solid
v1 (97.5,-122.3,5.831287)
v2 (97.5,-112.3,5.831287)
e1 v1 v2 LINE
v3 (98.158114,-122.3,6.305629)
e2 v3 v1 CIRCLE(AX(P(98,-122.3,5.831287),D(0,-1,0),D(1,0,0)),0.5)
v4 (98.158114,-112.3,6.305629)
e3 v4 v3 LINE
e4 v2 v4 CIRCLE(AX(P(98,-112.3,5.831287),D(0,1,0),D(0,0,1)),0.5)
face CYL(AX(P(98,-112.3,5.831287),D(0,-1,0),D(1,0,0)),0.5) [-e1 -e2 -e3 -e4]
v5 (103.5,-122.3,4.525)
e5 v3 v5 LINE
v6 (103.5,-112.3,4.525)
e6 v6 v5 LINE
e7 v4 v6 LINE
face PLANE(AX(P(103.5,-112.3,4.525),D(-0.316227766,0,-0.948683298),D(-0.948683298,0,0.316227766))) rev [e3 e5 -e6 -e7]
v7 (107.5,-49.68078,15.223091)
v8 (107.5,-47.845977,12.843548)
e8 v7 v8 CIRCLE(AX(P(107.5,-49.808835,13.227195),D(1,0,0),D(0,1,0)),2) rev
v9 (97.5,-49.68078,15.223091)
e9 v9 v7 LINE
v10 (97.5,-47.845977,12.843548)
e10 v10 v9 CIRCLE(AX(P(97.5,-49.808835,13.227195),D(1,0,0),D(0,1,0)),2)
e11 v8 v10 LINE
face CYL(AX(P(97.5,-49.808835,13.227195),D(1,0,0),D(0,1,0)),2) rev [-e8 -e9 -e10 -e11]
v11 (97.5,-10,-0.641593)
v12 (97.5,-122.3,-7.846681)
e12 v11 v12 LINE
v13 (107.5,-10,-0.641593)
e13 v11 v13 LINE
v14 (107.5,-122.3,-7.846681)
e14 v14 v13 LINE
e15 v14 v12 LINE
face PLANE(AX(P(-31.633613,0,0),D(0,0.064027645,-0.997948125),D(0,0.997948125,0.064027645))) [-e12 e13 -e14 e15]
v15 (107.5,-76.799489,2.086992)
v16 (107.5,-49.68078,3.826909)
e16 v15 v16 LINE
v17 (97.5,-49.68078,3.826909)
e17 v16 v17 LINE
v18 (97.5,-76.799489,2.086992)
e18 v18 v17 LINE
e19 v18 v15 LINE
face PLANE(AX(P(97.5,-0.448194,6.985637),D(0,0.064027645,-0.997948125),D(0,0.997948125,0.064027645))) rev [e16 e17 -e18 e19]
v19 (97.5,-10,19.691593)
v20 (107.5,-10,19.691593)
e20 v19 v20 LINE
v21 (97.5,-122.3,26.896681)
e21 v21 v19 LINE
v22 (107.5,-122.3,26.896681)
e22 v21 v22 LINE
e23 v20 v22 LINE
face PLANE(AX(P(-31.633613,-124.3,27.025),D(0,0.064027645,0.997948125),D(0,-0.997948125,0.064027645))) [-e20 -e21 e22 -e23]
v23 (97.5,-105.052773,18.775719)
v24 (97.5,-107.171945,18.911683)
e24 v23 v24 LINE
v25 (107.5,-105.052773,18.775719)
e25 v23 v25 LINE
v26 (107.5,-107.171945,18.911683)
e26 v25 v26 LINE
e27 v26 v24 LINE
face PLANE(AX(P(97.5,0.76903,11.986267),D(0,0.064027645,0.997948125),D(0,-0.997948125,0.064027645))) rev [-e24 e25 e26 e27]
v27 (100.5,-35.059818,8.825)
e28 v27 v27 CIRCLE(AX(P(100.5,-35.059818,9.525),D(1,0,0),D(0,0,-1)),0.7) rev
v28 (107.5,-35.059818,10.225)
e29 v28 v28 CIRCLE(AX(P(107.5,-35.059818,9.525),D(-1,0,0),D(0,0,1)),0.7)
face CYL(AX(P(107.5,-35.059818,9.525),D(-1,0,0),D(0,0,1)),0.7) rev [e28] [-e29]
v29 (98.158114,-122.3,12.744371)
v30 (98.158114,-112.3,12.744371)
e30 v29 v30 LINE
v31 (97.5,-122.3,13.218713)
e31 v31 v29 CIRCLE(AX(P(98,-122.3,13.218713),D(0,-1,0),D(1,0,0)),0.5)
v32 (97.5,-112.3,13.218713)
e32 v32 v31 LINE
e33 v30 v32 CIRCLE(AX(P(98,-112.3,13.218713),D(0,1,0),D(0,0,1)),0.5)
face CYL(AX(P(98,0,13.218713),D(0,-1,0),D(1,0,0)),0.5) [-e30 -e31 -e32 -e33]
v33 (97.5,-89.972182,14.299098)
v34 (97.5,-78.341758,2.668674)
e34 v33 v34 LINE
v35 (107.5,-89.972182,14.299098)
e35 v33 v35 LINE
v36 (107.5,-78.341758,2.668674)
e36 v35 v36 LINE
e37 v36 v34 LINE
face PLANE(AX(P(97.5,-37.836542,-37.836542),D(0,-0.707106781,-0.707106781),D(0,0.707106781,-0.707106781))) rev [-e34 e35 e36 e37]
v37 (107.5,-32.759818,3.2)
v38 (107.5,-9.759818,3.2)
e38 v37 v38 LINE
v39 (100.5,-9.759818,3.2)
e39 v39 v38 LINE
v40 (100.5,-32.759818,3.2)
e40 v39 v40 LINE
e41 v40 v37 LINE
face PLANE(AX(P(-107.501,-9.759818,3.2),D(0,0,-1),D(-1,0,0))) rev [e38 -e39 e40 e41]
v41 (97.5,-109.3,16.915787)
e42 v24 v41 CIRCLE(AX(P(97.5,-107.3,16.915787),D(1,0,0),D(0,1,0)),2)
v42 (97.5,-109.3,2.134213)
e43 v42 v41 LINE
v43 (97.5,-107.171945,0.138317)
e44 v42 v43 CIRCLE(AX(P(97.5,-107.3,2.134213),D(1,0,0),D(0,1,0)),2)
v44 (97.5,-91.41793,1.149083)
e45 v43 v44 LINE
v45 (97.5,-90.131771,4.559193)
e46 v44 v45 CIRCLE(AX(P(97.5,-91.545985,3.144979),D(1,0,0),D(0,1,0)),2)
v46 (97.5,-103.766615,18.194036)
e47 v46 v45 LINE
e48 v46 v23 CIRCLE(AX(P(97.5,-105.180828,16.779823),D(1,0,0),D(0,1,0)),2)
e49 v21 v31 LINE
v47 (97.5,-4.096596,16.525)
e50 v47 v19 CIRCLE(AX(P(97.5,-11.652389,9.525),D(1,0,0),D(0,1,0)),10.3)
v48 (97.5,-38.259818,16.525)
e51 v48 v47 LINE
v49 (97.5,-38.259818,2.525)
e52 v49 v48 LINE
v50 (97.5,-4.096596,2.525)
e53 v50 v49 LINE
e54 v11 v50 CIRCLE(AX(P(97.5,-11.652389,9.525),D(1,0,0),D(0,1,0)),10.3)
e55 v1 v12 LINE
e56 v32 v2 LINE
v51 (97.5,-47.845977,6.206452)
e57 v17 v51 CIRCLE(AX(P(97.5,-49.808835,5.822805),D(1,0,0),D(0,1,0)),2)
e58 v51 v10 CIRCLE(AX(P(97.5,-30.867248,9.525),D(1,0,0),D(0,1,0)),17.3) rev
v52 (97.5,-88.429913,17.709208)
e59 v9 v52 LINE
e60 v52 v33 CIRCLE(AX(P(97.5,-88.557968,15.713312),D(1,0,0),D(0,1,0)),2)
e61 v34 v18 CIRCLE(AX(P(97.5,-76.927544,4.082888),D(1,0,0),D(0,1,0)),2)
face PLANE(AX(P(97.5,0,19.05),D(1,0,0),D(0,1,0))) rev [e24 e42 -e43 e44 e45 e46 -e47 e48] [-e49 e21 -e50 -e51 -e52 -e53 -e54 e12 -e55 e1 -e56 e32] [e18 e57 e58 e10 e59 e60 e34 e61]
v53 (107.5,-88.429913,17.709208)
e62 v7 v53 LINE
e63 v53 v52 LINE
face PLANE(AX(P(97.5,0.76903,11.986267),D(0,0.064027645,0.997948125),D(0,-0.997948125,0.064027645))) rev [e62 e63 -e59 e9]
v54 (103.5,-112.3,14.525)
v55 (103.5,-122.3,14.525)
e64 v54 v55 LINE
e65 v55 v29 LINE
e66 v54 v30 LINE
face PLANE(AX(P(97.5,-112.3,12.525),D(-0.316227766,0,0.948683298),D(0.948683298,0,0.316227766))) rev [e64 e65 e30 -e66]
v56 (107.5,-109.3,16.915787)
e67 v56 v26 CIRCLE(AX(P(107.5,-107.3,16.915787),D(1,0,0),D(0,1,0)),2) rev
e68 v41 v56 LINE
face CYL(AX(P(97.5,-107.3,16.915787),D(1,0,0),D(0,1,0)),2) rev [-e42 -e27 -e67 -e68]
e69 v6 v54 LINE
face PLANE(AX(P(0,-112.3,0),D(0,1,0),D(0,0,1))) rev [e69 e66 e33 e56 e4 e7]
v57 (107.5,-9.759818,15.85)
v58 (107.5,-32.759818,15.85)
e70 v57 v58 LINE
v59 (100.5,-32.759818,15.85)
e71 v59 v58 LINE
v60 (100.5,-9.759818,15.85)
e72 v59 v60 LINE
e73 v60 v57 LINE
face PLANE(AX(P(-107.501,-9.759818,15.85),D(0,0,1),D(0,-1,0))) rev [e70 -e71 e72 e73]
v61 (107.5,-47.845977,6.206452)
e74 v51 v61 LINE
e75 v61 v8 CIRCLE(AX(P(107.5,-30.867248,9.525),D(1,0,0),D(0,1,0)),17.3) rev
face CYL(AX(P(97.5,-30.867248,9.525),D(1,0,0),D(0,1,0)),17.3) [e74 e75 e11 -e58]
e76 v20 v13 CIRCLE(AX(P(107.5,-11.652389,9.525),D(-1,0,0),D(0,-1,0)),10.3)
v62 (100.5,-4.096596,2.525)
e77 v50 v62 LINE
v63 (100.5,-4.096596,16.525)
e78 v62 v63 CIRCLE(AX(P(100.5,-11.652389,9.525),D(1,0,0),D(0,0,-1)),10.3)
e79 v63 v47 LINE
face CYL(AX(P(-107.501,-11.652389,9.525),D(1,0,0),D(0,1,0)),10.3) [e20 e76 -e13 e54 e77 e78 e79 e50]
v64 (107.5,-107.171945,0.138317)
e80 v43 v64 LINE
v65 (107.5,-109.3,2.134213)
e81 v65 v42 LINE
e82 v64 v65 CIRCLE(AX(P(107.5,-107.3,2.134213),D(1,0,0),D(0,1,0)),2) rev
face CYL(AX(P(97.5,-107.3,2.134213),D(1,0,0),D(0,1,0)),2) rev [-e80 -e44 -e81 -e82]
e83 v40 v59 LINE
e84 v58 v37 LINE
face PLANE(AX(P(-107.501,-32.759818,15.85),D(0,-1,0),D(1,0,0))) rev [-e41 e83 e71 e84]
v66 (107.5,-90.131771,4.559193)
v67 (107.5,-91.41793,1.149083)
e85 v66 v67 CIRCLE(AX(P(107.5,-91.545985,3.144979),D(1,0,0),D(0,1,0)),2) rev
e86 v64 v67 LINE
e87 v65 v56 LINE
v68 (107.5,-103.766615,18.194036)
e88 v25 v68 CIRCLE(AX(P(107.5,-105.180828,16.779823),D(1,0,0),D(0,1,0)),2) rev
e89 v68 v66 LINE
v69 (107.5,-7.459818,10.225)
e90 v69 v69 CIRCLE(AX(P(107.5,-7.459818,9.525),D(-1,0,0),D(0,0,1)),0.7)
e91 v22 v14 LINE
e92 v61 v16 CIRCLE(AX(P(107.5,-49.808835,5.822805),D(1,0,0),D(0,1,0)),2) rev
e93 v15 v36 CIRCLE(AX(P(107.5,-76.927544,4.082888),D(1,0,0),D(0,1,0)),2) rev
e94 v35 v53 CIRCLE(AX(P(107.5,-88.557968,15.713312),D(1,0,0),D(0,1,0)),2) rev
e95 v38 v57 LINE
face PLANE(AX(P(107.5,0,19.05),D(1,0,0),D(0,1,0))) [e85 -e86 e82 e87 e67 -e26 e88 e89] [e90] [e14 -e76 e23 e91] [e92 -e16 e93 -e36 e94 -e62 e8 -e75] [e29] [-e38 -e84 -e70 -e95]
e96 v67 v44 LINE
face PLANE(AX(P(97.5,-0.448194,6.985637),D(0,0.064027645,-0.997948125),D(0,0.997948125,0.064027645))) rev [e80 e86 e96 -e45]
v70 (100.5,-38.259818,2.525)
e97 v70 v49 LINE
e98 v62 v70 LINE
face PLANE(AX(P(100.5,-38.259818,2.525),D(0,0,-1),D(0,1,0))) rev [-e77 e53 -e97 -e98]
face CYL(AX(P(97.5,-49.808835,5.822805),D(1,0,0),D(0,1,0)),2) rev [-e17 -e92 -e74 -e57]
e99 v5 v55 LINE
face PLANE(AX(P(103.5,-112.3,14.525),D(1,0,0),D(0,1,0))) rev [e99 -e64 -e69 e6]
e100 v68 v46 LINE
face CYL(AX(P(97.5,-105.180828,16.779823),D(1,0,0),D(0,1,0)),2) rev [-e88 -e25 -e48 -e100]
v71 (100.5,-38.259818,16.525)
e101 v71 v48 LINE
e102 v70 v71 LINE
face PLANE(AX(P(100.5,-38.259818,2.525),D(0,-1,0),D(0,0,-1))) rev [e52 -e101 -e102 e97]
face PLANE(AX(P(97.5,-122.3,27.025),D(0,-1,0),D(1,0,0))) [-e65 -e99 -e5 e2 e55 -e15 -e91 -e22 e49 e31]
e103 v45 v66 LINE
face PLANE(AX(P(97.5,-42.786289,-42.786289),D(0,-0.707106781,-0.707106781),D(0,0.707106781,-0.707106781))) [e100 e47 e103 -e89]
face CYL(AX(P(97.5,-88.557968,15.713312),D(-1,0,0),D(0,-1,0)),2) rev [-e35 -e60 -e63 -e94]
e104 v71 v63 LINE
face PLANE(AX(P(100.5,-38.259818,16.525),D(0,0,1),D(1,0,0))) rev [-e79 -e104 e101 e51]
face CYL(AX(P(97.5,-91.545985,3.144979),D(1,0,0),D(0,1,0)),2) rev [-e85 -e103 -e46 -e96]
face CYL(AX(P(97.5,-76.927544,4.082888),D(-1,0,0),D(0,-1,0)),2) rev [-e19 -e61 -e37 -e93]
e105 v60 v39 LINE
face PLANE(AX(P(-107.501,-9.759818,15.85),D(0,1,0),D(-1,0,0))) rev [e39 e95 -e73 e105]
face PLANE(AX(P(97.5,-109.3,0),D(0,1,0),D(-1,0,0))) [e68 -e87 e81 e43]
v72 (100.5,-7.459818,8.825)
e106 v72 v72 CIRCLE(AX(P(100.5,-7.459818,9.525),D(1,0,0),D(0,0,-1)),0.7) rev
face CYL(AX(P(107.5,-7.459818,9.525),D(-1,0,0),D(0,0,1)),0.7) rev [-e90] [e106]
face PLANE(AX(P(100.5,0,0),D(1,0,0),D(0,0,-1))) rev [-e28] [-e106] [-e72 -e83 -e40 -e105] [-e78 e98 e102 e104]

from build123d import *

# Parameters (mm, degrees)
STOCK_FRAME_1_START       = 97.5
STOCK_FRAME_1_DEPTH       = 10
STOCK_FRAME_1_START_2     = 100.5
STOCK_FRAME_1_2_OUTLINE_R = 0.7
STOCK_FRAME_1_2_OUTLINE_W = 23
STOCK_FRAME_1_2_OUTLINE_H = 12.65
STOCK_FRAME_1_2_DEPTH     = 7
CUT_EXTRUDE1_DEPTH        = 128.596397383
CUT_EXTRUDE1_DEPTH_BACK   = 128.596397383
SKETCH1_W                 = 49.919710218
SKETCH1_H                 = 2
CUT_EXTRUDE2_DEPTH        = 10
FILLET1_R                 = 0.5


# Read off the part's stored shape, not the designer's step: Stock-frame-1
with BuildPart() as part:
    # Stock-frame-1 outline → Stock-frame-1 (new body)
    with BuildSketch(Plane.YZ.offset(STOCK_FRAME_1_START)):
        with BuildLine():
            Line((-4.096596213, 2.525), (-38.259818101, 2.525))
            Line((-38.259818101, 2.525), (-38.259818101, 16.525))
            Line((-38.259818101, 16.525), (-4.096596213, 16.525))
            ThreePointArc((-4.096596213, 16.525), (-6.783664239, 18.601647078), (-10, 19.69159292))
            Line((-10, 19.69159292), (-124.3, 27.025))
            Line((-124.3, 27.025), (-124.3, -7.975))
            Line((-124.3, -7.975), (-10, -0.64159292))
            ThreePointArc((-10, -0.64159292), (-6.783664239, 0.448352922), (-4.096596213, 2.525))
        make_face()
        with BuildLine():
            ThreePointArc((-109.3, 16.915787193), (-108.668190305, 18.374572746), (-107.17194471, 18.911683443))
            Line((-107.17194471, 18.911683443), (-105.052772964, 18.775718884))
            ThreePointArc((-105.052772964, 18.775718884), (-104.356669901, 18.602118716), (-103.766614692, 18.194036196))
            Line((-103.766614692, 18.194036196), (-90.131771322, 4.559192826))
            ThreePointArc((-90.131771322, 4.559192826), (-89.674659008, 2.439189307), (-91.417929594, 1.149083013))
            Line((-91.417929594, 1.149083013), (-107.17194471, 0.138316557))
            ThreePointArc((-107.17194471, 0.138316557), (-108.668190305, 0.675427254), (-109.3, 2.134212807))
            Line((-109.3, 2.134212807), (-109.3, 16.915787193))
        make_face(mode=Mode.SUBTRACT)
        with BuildLine():
            ThreePointArc((-49.680780162, 15.223091028), (-48.224999236, 14.448449394), (-47.845976598, 12.84354765))
            ThreePointArc((-47.845976598, 12.84354765), (-48.167247509, 9.525), (-47.845976598, 6.20645235))
            ThreePointArc((-47.845976598, 6.20645235), (-48.224999236, 4.601550606), (-49.680780162, 3.826908972))
            Line((-49.680780162, 3.826908972), (-76.799489195, 2.0869918))
            ThreePointArc((-76.799489195, 2.0869918), (-77.633334442, 2.211562173), (-78.341758047, 2.668674488))
            Line((-78.341758047, 2.668674488), (-89.972181694, 14.299098134))
            ThreePointArc((-89.972181694, 14.299098134), (-90.380264213, 16.53747005), (-88.429912841, 17.709207947))
            Line((-88.429912841, 17.709207947), (-49.680780162, 15.223091028))
        make_face(mode=Mode.SUBTRACT)
    extrude(amount=STOCK_FRAME_1_DEPTH)

    # Stock-frame-1 2 outline → Stock-frame-1 2 (add)
    with BuildSketch(Plane.YZ.offset(STOCK_FRAME_1_START_2)):
        with BuildLine():
            Line((-38.259818101, 16.525), (-38.259818101, 2.525))
            Line((-38.259818101, 2.525), (-4.096596213, 2.525))
            ThreePointArc((-4.096596213, 2.525), (-1.352388693, 9.525), (-4.096596213, 16.525))
            Line((-4.096596213, 16.525), (-38.259818101, 16.525))
        make_face()
        with Locations((-35.059818101, 9.525)):
            Circle(STOCK_FRAME_1_2_OUTLINE_R, mode=Mode.SUBTRACT)
        with Locations((-21.259818101, 9.525)):
            Rectangle(STOCK_FRAME_1_2_OUTLINE_W, STOCK_FRAME_1_2_OUTLINE_H, mode=Mode.SUBTRACT)
        with Locations((-7.459818101, 9.525)):
            Circle(STOCK_FRAME_1_2_OUTLINE_R, mode=Mode.SUBTRACT)
    extrude(amount=STOCK_FRAME_1_2_DEPTH)

    # Sketch1 → Cut-Extrude1 (cut, two sides: drawn at the far end of the back side and taken through both)
    with BuildSketch(Plane(origin=(107.5, 0, 0), x_dir=(0, 0, -1), z_dir=(1, 0, 0)).offset(-CUT_EXTRUDE1_DEPTH_BACK)):
        with Locations((-2.065144891, -123.3)):
            Rectangle(SKETCH1_W, SKETCH1_H)
    extrude(amount=CUT_EXTRUDE1_DEPTH + CUT_EXTRUDE1_DEPTH_BACK, mode=Mode.SUBTRACT)

    # Sketch2 → Cut-Extrude2 (cut)
    with BuildSketch(Plane.XZ.offset(122.3)):
        Polygon((97.5, 12.525), (103.5, 14.525), (103.5, 4.525), (97.5, 6.525), align=None)
    extrude(amount=-CUT_EXTRUDE2_DEPTH, mode=Mode.SUBTRACT)

    # Fillet1
    fillet1_edges = [part.edges().sort_by_distance(p)[0] for p in [
        (97.5, -117.3, 6.525),
        (97.5, -117.3, 12.525),
    ]]
    fillet(fillet1_edges, radius=FILLET1_R)


solid = part.part
